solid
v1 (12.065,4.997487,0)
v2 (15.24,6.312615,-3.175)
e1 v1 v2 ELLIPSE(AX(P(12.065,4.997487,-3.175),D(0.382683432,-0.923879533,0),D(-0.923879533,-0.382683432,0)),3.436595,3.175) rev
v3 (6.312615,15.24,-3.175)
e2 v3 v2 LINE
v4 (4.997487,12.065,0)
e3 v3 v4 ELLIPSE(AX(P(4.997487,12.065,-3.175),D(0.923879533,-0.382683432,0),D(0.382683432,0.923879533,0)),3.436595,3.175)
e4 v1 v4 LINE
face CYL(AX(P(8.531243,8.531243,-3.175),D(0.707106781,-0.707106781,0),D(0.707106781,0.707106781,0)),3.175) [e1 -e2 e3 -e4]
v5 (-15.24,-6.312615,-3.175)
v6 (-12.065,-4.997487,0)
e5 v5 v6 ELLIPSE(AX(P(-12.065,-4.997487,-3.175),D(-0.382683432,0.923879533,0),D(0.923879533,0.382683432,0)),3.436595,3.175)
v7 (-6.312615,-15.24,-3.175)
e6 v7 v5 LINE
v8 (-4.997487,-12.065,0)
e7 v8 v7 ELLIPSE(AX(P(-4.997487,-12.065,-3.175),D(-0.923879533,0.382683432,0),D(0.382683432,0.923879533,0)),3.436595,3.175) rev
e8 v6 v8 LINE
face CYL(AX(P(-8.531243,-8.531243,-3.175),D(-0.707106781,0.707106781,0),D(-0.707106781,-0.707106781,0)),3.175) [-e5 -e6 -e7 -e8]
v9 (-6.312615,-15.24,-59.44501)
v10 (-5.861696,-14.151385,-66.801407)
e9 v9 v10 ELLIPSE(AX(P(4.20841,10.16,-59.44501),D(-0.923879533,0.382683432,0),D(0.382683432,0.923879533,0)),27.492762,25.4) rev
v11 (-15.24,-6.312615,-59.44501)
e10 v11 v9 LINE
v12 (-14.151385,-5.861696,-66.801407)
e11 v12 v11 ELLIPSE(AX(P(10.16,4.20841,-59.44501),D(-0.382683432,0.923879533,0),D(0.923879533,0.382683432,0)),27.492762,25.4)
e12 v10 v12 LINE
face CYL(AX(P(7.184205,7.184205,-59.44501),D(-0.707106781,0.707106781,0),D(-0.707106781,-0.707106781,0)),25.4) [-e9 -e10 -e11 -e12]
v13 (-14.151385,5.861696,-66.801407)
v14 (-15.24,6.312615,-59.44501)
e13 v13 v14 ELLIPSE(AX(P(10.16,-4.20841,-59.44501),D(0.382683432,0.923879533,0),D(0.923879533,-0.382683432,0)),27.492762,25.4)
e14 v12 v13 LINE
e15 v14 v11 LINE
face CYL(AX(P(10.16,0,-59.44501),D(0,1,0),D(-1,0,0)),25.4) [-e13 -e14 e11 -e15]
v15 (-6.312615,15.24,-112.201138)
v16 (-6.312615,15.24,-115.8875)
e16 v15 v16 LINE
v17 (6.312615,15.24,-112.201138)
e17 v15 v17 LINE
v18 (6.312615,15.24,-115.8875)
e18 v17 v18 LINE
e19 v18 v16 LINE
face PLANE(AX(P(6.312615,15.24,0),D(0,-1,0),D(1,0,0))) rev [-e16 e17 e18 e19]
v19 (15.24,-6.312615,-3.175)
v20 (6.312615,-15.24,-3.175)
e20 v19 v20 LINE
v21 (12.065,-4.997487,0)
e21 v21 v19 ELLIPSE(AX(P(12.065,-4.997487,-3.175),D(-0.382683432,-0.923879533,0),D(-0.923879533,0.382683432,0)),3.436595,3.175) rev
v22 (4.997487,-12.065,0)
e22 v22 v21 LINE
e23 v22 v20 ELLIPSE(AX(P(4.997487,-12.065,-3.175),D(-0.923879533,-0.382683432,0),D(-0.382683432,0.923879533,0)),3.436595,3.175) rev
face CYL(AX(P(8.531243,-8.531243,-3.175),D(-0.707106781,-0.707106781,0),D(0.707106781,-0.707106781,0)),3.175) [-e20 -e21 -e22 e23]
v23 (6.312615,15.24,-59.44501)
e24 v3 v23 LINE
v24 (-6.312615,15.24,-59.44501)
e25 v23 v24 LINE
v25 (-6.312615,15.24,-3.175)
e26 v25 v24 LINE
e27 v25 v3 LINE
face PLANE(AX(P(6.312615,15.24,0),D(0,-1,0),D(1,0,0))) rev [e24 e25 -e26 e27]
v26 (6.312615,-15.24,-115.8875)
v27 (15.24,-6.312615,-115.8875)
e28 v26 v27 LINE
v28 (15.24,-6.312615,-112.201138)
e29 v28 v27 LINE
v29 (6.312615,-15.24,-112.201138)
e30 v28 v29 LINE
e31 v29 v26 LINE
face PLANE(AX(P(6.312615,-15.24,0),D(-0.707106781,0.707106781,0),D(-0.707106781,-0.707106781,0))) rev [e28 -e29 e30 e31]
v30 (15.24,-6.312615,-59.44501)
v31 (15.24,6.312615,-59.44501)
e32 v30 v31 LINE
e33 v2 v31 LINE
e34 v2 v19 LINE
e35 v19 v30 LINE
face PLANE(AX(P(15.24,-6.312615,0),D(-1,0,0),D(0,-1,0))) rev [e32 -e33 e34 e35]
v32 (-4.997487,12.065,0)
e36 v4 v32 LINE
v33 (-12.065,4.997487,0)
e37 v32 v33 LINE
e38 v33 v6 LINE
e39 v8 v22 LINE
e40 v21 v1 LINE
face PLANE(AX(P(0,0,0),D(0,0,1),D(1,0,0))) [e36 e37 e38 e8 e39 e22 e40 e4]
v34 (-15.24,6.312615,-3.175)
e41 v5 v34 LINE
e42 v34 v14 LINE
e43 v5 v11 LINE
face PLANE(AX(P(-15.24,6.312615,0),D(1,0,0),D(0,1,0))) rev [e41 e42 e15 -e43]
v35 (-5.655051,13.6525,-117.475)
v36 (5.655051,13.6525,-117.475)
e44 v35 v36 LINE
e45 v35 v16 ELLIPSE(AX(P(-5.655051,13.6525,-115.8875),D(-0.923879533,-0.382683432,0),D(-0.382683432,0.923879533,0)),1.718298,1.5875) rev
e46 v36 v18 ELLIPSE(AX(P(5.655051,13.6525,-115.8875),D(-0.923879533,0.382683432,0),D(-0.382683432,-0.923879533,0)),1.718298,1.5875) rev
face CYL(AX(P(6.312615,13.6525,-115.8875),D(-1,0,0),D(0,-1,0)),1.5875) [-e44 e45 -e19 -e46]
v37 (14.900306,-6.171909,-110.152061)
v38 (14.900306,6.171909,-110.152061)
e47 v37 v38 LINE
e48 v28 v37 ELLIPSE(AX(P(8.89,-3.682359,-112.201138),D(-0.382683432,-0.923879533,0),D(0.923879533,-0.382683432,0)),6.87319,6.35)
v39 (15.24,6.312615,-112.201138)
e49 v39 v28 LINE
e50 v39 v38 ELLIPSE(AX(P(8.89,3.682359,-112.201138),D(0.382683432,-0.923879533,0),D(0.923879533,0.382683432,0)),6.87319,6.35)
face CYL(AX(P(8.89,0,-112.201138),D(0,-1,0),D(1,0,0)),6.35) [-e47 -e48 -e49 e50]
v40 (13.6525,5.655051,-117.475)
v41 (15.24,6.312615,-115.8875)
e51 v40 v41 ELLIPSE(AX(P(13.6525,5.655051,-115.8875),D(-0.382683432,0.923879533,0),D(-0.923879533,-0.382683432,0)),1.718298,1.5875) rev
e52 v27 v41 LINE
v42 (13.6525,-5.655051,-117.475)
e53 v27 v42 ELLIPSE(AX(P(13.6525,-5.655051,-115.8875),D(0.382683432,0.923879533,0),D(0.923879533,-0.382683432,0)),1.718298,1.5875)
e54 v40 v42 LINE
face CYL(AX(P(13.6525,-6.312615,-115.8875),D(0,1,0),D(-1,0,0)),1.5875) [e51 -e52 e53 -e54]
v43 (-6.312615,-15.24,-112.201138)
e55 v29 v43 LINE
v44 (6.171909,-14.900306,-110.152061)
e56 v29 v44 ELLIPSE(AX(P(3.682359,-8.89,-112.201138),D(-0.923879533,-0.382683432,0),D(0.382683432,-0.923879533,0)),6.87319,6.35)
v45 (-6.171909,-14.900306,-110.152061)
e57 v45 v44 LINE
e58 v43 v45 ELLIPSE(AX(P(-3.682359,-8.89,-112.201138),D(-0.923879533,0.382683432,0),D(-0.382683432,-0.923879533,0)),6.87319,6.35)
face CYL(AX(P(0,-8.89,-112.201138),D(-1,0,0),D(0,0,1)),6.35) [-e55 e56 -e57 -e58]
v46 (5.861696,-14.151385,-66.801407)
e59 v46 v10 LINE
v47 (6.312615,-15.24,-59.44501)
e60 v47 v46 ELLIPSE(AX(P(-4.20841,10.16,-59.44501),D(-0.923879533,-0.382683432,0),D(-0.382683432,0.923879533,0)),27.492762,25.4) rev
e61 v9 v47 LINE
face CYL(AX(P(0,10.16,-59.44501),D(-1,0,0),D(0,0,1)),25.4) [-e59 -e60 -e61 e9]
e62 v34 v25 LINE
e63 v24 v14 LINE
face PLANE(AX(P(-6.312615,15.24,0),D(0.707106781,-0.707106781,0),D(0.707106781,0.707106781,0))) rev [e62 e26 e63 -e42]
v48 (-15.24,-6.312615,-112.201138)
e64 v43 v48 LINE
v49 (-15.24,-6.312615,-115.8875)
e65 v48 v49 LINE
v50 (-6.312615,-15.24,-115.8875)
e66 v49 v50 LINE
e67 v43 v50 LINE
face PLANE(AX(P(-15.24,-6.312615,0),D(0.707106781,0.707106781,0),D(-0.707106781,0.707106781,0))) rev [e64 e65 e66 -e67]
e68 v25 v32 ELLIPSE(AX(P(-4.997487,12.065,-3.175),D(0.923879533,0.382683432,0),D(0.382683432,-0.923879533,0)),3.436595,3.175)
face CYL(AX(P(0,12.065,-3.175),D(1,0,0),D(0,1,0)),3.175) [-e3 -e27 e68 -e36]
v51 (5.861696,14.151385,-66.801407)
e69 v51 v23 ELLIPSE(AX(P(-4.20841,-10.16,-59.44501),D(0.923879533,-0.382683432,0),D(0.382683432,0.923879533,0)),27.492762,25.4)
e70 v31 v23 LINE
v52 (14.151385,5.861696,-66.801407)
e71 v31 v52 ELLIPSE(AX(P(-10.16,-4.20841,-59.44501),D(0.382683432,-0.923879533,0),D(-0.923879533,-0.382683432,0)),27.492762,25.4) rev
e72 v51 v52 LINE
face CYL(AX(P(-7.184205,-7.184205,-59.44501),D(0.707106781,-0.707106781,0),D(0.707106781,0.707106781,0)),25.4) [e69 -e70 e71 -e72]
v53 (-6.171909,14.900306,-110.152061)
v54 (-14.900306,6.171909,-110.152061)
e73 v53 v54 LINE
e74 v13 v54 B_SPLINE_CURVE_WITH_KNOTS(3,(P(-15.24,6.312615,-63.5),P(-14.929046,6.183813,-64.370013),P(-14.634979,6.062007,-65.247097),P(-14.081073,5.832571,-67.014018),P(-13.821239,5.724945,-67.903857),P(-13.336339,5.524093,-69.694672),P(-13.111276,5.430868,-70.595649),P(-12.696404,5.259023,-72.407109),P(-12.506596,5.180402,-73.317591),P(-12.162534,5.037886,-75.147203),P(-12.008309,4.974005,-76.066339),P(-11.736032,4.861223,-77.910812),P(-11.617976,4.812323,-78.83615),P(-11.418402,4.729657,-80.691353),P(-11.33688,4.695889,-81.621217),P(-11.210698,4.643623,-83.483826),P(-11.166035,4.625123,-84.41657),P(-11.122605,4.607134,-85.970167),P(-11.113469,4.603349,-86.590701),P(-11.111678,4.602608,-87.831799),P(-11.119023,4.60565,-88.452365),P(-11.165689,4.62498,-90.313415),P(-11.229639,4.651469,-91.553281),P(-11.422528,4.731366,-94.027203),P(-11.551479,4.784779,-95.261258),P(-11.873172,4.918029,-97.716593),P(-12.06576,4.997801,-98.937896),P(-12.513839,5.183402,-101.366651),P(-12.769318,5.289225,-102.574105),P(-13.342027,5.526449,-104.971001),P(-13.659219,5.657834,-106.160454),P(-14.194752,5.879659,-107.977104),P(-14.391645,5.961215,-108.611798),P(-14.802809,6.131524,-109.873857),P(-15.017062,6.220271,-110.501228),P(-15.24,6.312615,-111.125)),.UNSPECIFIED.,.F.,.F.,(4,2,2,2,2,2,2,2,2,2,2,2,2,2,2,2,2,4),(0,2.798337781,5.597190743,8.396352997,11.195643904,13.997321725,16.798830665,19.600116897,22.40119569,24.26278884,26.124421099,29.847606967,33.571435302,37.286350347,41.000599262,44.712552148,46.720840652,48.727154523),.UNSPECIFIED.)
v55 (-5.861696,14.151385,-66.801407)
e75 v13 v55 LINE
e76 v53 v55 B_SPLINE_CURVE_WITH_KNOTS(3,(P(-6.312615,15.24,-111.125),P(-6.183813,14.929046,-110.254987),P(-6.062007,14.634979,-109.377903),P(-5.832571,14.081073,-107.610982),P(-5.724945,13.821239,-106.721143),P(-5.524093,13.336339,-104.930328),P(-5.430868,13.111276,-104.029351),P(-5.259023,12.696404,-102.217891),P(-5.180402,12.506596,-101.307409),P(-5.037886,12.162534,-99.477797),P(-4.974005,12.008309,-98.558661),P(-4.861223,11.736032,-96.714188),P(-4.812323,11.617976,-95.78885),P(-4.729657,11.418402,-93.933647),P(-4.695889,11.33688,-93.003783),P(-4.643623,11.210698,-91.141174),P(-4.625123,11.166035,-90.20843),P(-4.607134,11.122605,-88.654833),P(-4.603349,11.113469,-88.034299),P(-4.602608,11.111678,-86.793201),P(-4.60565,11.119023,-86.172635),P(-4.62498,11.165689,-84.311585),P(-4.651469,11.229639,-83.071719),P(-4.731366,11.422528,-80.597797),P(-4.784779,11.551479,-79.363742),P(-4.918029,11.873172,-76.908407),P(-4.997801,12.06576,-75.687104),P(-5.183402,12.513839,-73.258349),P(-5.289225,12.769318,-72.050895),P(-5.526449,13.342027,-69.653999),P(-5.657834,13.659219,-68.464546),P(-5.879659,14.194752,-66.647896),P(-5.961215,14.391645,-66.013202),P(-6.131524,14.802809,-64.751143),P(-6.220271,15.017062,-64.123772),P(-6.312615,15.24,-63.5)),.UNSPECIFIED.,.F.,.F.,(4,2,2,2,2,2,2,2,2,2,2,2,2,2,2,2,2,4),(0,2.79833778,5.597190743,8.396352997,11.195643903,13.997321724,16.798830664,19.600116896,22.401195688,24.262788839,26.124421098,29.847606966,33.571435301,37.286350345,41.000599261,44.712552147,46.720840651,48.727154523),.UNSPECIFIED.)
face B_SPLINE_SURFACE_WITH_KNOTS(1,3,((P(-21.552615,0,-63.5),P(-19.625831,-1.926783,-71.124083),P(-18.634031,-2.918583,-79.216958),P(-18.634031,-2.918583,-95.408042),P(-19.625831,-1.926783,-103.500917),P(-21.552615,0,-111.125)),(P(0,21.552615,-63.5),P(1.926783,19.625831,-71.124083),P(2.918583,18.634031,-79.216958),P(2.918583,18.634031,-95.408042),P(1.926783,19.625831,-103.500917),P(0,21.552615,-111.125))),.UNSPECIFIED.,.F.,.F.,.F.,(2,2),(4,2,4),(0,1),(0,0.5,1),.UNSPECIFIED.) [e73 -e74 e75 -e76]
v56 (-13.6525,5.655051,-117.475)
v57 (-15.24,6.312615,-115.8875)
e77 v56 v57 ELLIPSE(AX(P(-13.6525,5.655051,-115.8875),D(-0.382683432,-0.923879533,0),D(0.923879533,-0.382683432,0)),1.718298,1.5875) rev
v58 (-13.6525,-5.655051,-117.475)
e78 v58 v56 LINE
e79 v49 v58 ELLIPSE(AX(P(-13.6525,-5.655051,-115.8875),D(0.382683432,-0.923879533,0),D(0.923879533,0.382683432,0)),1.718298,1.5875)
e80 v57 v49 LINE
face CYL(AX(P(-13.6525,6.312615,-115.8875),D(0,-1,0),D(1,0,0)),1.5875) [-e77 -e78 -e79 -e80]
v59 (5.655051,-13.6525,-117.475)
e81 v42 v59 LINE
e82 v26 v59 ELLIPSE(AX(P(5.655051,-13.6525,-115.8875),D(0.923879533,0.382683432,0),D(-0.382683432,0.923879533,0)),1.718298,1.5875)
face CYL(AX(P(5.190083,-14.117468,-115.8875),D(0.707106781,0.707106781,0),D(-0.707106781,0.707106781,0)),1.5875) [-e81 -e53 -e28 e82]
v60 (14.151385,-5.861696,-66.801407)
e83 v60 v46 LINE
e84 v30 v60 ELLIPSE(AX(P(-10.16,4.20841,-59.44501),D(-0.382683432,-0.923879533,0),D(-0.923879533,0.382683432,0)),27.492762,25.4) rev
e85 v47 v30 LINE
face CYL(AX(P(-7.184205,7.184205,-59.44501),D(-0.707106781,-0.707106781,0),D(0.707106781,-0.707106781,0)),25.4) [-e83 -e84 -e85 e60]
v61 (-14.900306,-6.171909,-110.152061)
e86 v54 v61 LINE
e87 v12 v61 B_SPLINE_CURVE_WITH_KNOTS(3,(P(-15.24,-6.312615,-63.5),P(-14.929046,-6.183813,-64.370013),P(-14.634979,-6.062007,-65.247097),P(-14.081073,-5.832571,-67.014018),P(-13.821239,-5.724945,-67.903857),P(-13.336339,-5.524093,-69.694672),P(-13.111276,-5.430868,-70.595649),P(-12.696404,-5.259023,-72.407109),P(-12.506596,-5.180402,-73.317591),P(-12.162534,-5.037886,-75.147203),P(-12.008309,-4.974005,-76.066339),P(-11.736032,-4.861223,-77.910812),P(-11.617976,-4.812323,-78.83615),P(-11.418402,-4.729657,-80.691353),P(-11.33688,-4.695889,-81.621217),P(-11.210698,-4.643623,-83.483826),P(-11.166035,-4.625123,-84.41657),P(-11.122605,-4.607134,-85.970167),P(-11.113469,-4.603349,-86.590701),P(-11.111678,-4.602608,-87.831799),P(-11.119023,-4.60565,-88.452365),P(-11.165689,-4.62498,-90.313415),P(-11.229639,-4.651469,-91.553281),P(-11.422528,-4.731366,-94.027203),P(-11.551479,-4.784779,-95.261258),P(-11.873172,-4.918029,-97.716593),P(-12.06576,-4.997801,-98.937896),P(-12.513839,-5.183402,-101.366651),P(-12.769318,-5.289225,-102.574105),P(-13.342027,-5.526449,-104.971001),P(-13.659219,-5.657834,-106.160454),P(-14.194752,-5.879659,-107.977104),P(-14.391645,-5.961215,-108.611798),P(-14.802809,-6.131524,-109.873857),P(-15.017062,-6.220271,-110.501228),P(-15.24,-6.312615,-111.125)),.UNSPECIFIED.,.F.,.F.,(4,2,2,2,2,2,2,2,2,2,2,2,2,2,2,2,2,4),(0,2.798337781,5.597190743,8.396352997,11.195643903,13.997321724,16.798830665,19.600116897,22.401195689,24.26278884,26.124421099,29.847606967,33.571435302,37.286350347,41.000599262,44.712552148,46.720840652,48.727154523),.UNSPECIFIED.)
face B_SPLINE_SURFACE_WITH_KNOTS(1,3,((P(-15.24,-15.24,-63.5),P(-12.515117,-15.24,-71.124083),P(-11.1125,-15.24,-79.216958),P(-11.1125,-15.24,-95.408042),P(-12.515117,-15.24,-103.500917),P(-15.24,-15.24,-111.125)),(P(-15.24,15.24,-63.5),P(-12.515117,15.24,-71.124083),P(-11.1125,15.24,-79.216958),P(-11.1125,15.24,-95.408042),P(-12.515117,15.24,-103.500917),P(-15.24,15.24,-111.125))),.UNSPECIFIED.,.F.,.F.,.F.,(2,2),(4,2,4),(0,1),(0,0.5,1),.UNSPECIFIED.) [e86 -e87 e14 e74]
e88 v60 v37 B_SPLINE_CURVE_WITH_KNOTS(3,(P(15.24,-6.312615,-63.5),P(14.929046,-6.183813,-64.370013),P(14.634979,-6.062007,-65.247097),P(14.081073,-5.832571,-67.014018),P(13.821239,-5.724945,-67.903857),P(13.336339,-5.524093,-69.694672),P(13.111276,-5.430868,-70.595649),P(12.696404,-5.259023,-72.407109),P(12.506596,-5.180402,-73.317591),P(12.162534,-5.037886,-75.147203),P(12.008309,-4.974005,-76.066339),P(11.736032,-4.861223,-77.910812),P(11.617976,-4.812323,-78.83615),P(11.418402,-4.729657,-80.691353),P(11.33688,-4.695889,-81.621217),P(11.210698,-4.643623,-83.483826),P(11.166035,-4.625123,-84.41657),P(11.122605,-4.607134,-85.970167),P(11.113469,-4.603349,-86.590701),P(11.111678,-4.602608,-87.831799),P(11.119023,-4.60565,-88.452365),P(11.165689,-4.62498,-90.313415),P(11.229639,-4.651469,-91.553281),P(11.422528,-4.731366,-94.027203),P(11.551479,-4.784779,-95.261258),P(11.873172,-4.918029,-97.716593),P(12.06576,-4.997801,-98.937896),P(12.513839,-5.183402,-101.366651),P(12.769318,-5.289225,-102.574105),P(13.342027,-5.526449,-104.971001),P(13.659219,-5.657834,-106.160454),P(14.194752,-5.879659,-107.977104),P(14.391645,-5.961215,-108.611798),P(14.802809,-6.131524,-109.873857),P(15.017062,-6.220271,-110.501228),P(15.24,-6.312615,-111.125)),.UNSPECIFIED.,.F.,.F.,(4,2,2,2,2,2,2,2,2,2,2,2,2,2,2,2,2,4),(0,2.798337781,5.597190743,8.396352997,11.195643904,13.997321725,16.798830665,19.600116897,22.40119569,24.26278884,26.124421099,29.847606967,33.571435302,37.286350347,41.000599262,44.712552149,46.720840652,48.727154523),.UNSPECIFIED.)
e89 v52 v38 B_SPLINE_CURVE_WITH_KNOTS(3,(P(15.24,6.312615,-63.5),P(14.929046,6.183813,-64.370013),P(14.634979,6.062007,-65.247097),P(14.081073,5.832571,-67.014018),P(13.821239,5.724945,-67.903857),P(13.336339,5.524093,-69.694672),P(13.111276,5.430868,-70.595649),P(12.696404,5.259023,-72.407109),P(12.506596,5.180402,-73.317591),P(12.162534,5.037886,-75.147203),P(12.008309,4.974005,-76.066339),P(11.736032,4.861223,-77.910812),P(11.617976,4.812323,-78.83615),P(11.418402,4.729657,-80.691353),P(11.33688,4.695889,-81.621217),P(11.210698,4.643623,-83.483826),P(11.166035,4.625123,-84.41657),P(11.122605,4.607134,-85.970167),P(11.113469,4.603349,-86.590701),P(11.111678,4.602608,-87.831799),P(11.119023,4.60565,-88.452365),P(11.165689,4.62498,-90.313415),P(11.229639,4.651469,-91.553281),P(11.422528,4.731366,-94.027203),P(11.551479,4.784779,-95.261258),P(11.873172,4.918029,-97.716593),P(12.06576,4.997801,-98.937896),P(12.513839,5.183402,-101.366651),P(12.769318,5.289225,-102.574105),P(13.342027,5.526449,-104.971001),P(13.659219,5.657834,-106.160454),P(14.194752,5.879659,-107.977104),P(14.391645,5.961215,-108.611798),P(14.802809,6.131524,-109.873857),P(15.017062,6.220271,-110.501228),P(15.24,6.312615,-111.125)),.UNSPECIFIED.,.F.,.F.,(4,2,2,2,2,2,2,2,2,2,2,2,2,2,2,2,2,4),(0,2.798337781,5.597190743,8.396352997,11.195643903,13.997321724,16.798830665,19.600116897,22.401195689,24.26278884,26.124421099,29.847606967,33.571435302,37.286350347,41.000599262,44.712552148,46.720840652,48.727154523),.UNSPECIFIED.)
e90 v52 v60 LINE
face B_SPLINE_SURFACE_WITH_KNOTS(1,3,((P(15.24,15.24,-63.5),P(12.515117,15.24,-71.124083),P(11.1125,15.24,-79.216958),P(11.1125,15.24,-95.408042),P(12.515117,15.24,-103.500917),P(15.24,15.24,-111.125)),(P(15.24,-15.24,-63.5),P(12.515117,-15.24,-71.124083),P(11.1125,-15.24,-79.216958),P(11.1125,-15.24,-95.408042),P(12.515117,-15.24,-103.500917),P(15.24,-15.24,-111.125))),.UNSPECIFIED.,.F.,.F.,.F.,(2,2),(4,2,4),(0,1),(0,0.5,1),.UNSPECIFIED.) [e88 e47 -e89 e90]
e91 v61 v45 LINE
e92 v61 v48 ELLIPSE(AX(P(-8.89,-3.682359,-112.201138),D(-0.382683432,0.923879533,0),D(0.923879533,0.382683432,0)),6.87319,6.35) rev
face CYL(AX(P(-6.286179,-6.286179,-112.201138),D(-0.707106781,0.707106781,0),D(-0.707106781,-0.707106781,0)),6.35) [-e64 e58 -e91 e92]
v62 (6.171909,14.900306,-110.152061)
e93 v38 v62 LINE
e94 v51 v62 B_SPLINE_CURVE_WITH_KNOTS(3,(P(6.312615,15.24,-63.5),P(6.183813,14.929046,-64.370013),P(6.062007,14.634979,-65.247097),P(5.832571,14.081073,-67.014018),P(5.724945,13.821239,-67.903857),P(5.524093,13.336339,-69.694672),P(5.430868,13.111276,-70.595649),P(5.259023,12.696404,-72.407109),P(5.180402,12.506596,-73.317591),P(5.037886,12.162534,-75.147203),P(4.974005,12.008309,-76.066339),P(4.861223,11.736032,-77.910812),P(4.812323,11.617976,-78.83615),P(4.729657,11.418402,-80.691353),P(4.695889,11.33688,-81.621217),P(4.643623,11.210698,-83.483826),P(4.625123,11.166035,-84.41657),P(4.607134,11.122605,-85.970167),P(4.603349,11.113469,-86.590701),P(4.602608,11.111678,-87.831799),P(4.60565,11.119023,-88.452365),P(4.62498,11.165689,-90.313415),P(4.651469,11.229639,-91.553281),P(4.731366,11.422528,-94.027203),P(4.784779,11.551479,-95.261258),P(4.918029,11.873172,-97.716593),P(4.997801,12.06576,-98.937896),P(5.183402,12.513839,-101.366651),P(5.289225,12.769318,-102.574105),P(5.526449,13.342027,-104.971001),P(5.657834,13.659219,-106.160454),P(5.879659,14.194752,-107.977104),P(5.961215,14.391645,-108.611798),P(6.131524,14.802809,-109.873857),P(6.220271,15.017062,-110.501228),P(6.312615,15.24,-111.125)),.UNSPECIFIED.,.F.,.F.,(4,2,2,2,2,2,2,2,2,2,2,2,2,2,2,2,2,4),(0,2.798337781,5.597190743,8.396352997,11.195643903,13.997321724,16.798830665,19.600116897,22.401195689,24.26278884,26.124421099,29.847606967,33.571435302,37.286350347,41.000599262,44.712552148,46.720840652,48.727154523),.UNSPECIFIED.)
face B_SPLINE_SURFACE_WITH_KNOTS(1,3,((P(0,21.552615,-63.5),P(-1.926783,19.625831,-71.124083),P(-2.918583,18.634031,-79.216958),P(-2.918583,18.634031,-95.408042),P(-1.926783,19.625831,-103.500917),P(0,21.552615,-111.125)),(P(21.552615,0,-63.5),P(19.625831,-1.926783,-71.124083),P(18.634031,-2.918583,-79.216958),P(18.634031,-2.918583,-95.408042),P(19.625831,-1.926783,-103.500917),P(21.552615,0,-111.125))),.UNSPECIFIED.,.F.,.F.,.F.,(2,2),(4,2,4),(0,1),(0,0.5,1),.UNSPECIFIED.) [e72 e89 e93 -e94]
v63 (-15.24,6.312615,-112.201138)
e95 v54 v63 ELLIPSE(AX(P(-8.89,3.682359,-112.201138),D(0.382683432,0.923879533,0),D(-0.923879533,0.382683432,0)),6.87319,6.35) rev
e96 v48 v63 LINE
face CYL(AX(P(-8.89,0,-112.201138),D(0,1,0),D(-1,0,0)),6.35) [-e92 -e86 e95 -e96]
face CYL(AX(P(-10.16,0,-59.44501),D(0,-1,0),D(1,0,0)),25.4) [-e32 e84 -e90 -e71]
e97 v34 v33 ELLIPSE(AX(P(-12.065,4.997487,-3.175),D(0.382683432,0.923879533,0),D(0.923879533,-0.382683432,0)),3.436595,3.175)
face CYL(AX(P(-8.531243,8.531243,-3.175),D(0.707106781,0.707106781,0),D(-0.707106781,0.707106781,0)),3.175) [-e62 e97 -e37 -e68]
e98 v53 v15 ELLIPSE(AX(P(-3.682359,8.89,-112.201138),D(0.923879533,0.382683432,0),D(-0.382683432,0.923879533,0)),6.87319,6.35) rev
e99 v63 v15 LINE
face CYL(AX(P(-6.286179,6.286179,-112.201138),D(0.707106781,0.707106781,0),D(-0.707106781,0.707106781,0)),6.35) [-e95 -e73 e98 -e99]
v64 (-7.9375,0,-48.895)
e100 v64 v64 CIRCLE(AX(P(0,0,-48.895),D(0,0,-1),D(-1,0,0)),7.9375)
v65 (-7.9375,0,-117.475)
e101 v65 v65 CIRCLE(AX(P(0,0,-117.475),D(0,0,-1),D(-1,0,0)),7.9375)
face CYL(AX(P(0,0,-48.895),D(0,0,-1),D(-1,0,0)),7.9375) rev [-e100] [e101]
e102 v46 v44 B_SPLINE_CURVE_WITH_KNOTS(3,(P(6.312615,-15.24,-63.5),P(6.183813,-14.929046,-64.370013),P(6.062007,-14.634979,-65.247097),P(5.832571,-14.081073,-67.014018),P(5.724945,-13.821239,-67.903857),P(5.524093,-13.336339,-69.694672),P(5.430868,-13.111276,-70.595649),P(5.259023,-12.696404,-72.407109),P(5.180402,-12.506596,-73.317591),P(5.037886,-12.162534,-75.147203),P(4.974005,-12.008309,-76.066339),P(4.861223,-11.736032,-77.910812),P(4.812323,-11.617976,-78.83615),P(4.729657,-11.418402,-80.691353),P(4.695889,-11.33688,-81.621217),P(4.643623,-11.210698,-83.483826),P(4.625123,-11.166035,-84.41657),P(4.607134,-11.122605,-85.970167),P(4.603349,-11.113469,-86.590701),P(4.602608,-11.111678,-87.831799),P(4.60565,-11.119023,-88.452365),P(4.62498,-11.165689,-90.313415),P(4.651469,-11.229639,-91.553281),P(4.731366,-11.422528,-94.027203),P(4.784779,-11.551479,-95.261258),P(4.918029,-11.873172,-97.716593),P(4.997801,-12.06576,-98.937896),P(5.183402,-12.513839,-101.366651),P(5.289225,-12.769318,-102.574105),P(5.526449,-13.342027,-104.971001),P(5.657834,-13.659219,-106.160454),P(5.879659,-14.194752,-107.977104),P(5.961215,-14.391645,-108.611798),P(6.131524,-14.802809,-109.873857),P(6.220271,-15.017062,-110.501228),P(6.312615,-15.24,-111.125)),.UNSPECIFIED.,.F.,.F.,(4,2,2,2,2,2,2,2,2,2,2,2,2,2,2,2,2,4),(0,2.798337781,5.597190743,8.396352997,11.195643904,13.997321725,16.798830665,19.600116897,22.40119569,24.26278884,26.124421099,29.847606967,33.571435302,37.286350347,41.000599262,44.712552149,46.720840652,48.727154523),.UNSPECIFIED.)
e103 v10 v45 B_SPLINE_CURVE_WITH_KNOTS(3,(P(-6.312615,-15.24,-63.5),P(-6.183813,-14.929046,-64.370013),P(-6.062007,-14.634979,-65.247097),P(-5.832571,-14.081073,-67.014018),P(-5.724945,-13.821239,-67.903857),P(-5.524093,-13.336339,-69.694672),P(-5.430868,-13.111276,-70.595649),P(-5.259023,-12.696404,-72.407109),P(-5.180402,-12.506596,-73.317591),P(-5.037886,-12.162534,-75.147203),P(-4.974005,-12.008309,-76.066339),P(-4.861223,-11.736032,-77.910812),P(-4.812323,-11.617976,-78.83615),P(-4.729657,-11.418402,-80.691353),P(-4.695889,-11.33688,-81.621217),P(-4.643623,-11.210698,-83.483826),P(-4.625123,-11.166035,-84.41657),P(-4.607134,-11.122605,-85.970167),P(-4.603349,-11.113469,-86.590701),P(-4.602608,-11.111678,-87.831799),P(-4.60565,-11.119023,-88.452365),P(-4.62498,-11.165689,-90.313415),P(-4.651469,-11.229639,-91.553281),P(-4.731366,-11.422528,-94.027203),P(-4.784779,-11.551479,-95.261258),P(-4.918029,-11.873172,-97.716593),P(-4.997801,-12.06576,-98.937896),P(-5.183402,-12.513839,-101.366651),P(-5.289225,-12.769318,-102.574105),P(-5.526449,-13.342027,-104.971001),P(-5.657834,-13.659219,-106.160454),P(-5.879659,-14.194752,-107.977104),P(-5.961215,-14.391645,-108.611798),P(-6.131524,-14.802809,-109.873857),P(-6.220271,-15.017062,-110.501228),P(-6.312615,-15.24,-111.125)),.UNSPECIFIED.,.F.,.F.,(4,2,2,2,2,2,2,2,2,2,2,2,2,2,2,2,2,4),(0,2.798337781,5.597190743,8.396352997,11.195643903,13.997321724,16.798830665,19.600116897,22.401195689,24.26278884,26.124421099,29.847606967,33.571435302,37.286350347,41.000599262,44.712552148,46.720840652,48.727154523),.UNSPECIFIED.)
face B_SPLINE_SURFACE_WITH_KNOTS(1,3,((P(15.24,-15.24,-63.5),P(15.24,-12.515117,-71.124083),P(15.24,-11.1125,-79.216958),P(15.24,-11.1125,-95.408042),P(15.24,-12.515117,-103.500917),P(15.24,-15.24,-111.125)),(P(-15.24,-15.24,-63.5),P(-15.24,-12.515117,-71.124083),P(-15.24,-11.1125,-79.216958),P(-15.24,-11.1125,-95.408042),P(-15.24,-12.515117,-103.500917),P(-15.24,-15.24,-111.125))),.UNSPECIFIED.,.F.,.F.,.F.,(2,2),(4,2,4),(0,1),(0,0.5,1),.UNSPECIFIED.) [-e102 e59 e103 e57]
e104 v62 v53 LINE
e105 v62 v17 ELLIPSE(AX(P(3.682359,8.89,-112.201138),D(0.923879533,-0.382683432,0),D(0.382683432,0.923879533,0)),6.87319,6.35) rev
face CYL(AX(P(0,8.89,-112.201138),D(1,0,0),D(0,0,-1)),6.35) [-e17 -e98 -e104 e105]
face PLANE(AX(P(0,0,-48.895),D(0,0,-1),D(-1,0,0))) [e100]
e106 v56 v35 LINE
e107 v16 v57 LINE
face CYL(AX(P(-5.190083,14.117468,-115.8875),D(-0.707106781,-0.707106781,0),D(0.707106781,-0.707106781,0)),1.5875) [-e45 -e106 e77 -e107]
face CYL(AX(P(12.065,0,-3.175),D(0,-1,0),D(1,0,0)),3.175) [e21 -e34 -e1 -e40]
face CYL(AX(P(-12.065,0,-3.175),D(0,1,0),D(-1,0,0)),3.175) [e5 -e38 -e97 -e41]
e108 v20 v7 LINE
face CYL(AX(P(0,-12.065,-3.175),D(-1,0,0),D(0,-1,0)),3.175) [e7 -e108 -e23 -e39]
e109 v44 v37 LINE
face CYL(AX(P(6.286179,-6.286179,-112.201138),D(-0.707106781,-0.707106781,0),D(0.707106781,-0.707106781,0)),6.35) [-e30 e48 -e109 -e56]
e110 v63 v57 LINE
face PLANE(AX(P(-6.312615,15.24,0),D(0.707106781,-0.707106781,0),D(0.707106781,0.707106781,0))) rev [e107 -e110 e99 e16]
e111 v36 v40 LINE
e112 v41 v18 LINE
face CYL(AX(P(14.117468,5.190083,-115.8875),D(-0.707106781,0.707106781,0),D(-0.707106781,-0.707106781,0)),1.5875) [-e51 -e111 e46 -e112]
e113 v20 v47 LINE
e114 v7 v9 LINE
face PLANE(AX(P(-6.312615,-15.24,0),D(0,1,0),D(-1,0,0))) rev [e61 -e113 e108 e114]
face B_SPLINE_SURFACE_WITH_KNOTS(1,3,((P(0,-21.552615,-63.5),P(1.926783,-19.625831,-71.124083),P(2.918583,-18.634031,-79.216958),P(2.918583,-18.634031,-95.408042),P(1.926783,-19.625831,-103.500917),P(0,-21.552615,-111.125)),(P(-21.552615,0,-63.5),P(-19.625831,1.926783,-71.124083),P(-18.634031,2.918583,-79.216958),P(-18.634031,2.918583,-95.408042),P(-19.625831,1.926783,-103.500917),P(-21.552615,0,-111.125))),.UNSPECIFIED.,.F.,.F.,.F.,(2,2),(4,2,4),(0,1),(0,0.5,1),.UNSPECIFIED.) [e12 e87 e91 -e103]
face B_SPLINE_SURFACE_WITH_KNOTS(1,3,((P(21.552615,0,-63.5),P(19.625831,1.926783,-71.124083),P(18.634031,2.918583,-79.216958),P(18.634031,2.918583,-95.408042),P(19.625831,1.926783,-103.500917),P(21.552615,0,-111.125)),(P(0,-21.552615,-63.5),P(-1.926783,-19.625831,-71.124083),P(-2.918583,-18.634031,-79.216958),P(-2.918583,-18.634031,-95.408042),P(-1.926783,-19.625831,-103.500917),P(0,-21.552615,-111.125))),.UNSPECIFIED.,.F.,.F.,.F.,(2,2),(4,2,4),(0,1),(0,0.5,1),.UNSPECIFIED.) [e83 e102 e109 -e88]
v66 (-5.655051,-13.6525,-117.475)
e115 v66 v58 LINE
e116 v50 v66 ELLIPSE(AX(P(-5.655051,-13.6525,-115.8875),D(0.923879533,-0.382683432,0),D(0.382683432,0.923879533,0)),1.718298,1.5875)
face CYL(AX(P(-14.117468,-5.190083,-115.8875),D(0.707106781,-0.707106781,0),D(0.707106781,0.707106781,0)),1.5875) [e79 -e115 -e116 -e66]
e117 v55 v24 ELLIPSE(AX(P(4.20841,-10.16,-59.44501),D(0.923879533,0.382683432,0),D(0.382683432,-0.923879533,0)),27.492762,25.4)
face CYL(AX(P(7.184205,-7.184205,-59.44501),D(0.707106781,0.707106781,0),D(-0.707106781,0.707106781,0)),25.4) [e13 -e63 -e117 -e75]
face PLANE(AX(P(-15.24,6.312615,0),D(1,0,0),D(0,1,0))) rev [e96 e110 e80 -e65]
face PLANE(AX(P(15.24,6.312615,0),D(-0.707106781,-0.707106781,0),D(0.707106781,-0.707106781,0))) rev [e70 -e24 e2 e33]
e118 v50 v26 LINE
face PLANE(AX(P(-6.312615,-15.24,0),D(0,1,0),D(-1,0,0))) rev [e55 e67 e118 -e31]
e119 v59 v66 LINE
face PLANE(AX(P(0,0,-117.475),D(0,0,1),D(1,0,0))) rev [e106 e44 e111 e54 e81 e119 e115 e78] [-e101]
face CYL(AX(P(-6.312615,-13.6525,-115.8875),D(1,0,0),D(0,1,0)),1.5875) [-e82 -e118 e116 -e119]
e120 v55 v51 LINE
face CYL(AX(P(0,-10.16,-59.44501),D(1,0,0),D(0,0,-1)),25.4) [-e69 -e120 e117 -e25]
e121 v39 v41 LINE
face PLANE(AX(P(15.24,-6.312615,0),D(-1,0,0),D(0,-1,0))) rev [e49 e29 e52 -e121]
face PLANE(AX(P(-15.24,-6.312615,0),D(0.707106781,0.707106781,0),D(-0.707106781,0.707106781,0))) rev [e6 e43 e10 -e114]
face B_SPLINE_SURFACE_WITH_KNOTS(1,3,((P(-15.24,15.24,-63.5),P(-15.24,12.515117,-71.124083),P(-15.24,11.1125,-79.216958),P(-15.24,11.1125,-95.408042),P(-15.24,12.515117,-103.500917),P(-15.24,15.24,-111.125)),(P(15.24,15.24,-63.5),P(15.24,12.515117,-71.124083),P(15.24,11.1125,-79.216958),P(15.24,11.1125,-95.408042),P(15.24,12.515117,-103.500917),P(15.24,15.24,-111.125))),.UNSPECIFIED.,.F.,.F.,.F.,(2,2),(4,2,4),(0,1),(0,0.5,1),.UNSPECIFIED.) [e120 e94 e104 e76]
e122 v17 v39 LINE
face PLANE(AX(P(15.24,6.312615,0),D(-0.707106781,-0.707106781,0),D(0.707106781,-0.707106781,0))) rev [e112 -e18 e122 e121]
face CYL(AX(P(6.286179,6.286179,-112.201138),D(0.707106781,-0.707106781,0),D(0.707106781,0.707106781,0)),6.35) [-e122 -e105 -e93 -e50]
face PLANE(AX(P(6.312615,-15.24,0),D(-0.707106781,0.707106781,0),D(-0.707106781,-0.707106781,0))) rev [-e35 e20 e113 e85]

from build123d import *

# Parameters (mm, degrees)
CUT_SWEEP1_START   = -10.440114653
CUT_SWEEP1_DEPTH   = 20.880229306
CIRPATTERN1_COUNT  = 8
SKETCH5_R          = 7.9375
CUT_EXTRUDE1_DEPTH = 68.58
FILLET1_R          = 1.5875
FILLET2_R          = 3.175
FILLET3_R          = 25.4
FILLET4_R          = 6.35


# Read off the part's stored shape, not the designer's step: Cut-Sweep1
with BuildPart() as part:
    # Sweep2: sweep along a path in Sketch3
    with BuildLine(Plane(origin=(0, 0, 0), x_dir=(0, 0, -1), z_dir=(1, 0, 0))) as sweep2_path:
        Line((0, 0), (117.475, 0))
    # Sketch1 → Sweep2 (sweep)
    with BuildSketch(Plane.XY):
        Polygon((15.24, -6.312614691), (15.24, 6.312614691), (6.312614691, 15.24), (-6.312614691, 15.24), (-15.24, 6.312614691), (-15.24, -6.312614691), (-6.312614691, -15.24), (6.312614691, -15.24), align=None)
    sweep(path=sweep2_path.line)

    # Cut-Sweep1 outline → Cut-Sweep1 (cut)
    with BuildSketch(Plane.YZ.offset(CUT_SWEEP1_START)):
        with BuildLine():
            Line((15.24, -111.125), (15.24, -63.5))
            add(Edge.make_bspline(
                [(15.24, -63.5), (12.515117075, -71.124082686), (11.1125, -79.21695815), (11.1125, -95.40804185), (12.515117075, -103.500917314), (15.24, -111.125)],
                knots=[0, 0, 0, 0, 0.5, 0.5, 1, 1, 1, 1], degree=3))
        make_face()
    cut_sweep1 = extrude(amount=CUT_SWEEP1_DEPTH, mode=Mode.SUBTRACT)

    # CirPattern1: Cut-Sweep1 ×8 about axis
    cirpattern1_axis = Axis((0, 0, 0), (0, 0, -1))
    for i in range(1, CIRPATTERN1_COUNT):
        add(cut_sweep1.rotate(cirpattern1_axis, i * 360 / CIRPATTERN1_COUNT), mode=Mode.SUBTRACT)

    # Sketch5 → Cut-Extrude1 (cut)
    with BuildSketch(Plane(origin=(0, 0, -117.475), x_dir=(-1, 0, 0), z_dir=(0, 0, -1))):
        Circle(SKETCH5_R)
    extrude(amount=-CUT_EXTRUDE1_DEPTH, mode=Mode.SUBTRACT)

    # Fillet1
    fillet1_edges = [part.edges().sort_by_distance(p)[0] for p in [
        (10.776307345, -10.776307345, -117.475),
        (15.24, 0, -117.475),
        (10.776307345, 10.776307345, -117.475),
        (0, 15.24, -117.475),
        (-10.776307345, 10.776307345, -117.475),
        (-15.24, 0, -117.475),
        (-10.776307345, -10.776307345, -117.475),
        (0, -15.24, -117.475),
    ]]
    fillet(fillet1_edges, radius=FILLET1_R)

    # Fillet2
    fillet2_edges = [part.edges().sort_by_distance(p)[0] for p in [
        (15.24, 0, 0),
        (10.776307345, 10.776307345, 0),
        (0, 15.24, 0),
        (-10.776307345, 10.776307345, 0),
        (-15.24, 0, 0),
        (-10.776307345, -10.776307345, 0),
        (0, -15.24, 0),
        (10.776307345, -10.776307345, 0),
    ]]
    fillet(fillet2_edges, radius=FILLET2_R)

    # Fillet3
    fillet3_edges = [part.edges().sort_by_distance(p)[0] for p in [
        (10.776307345, 10.776307345, -63.5),
        (15.24, 0, -63.5),
        (10.776307345, -10.776307345, -63.5),
        (0, -15.24, -63.5),
        (-10.776307345, -10.776307345, -63.5),
        (-15.24, 0, -63.5),
        (-10.776307345, 10.776307345, -63.5),
        (0, 15.24, -63.5),
    ]]
    fillet(fillet3_edges, radius=FILLET3_R)

    # Fillet4
    fillet4_edges = [part.edges().sort_by_distance(p)[0] for p in [
        (-10.776307345, -10.776307345, -111.125),
        (0, -15.24, -111.125),
        (10.776307345, -10.776307345, -111.125),
        (15.24, 0, -111.125),
        (10.776307345, 10.776307345, -111.125),
        (0, 15.24, -111.125),
        (-10.776307345, 10.776307345, -111.125),
        (-15.24, 0, -111.125),
    ]]
    fillet(fillet4_edges, radius=FILLET4_R)


solid = part.part
